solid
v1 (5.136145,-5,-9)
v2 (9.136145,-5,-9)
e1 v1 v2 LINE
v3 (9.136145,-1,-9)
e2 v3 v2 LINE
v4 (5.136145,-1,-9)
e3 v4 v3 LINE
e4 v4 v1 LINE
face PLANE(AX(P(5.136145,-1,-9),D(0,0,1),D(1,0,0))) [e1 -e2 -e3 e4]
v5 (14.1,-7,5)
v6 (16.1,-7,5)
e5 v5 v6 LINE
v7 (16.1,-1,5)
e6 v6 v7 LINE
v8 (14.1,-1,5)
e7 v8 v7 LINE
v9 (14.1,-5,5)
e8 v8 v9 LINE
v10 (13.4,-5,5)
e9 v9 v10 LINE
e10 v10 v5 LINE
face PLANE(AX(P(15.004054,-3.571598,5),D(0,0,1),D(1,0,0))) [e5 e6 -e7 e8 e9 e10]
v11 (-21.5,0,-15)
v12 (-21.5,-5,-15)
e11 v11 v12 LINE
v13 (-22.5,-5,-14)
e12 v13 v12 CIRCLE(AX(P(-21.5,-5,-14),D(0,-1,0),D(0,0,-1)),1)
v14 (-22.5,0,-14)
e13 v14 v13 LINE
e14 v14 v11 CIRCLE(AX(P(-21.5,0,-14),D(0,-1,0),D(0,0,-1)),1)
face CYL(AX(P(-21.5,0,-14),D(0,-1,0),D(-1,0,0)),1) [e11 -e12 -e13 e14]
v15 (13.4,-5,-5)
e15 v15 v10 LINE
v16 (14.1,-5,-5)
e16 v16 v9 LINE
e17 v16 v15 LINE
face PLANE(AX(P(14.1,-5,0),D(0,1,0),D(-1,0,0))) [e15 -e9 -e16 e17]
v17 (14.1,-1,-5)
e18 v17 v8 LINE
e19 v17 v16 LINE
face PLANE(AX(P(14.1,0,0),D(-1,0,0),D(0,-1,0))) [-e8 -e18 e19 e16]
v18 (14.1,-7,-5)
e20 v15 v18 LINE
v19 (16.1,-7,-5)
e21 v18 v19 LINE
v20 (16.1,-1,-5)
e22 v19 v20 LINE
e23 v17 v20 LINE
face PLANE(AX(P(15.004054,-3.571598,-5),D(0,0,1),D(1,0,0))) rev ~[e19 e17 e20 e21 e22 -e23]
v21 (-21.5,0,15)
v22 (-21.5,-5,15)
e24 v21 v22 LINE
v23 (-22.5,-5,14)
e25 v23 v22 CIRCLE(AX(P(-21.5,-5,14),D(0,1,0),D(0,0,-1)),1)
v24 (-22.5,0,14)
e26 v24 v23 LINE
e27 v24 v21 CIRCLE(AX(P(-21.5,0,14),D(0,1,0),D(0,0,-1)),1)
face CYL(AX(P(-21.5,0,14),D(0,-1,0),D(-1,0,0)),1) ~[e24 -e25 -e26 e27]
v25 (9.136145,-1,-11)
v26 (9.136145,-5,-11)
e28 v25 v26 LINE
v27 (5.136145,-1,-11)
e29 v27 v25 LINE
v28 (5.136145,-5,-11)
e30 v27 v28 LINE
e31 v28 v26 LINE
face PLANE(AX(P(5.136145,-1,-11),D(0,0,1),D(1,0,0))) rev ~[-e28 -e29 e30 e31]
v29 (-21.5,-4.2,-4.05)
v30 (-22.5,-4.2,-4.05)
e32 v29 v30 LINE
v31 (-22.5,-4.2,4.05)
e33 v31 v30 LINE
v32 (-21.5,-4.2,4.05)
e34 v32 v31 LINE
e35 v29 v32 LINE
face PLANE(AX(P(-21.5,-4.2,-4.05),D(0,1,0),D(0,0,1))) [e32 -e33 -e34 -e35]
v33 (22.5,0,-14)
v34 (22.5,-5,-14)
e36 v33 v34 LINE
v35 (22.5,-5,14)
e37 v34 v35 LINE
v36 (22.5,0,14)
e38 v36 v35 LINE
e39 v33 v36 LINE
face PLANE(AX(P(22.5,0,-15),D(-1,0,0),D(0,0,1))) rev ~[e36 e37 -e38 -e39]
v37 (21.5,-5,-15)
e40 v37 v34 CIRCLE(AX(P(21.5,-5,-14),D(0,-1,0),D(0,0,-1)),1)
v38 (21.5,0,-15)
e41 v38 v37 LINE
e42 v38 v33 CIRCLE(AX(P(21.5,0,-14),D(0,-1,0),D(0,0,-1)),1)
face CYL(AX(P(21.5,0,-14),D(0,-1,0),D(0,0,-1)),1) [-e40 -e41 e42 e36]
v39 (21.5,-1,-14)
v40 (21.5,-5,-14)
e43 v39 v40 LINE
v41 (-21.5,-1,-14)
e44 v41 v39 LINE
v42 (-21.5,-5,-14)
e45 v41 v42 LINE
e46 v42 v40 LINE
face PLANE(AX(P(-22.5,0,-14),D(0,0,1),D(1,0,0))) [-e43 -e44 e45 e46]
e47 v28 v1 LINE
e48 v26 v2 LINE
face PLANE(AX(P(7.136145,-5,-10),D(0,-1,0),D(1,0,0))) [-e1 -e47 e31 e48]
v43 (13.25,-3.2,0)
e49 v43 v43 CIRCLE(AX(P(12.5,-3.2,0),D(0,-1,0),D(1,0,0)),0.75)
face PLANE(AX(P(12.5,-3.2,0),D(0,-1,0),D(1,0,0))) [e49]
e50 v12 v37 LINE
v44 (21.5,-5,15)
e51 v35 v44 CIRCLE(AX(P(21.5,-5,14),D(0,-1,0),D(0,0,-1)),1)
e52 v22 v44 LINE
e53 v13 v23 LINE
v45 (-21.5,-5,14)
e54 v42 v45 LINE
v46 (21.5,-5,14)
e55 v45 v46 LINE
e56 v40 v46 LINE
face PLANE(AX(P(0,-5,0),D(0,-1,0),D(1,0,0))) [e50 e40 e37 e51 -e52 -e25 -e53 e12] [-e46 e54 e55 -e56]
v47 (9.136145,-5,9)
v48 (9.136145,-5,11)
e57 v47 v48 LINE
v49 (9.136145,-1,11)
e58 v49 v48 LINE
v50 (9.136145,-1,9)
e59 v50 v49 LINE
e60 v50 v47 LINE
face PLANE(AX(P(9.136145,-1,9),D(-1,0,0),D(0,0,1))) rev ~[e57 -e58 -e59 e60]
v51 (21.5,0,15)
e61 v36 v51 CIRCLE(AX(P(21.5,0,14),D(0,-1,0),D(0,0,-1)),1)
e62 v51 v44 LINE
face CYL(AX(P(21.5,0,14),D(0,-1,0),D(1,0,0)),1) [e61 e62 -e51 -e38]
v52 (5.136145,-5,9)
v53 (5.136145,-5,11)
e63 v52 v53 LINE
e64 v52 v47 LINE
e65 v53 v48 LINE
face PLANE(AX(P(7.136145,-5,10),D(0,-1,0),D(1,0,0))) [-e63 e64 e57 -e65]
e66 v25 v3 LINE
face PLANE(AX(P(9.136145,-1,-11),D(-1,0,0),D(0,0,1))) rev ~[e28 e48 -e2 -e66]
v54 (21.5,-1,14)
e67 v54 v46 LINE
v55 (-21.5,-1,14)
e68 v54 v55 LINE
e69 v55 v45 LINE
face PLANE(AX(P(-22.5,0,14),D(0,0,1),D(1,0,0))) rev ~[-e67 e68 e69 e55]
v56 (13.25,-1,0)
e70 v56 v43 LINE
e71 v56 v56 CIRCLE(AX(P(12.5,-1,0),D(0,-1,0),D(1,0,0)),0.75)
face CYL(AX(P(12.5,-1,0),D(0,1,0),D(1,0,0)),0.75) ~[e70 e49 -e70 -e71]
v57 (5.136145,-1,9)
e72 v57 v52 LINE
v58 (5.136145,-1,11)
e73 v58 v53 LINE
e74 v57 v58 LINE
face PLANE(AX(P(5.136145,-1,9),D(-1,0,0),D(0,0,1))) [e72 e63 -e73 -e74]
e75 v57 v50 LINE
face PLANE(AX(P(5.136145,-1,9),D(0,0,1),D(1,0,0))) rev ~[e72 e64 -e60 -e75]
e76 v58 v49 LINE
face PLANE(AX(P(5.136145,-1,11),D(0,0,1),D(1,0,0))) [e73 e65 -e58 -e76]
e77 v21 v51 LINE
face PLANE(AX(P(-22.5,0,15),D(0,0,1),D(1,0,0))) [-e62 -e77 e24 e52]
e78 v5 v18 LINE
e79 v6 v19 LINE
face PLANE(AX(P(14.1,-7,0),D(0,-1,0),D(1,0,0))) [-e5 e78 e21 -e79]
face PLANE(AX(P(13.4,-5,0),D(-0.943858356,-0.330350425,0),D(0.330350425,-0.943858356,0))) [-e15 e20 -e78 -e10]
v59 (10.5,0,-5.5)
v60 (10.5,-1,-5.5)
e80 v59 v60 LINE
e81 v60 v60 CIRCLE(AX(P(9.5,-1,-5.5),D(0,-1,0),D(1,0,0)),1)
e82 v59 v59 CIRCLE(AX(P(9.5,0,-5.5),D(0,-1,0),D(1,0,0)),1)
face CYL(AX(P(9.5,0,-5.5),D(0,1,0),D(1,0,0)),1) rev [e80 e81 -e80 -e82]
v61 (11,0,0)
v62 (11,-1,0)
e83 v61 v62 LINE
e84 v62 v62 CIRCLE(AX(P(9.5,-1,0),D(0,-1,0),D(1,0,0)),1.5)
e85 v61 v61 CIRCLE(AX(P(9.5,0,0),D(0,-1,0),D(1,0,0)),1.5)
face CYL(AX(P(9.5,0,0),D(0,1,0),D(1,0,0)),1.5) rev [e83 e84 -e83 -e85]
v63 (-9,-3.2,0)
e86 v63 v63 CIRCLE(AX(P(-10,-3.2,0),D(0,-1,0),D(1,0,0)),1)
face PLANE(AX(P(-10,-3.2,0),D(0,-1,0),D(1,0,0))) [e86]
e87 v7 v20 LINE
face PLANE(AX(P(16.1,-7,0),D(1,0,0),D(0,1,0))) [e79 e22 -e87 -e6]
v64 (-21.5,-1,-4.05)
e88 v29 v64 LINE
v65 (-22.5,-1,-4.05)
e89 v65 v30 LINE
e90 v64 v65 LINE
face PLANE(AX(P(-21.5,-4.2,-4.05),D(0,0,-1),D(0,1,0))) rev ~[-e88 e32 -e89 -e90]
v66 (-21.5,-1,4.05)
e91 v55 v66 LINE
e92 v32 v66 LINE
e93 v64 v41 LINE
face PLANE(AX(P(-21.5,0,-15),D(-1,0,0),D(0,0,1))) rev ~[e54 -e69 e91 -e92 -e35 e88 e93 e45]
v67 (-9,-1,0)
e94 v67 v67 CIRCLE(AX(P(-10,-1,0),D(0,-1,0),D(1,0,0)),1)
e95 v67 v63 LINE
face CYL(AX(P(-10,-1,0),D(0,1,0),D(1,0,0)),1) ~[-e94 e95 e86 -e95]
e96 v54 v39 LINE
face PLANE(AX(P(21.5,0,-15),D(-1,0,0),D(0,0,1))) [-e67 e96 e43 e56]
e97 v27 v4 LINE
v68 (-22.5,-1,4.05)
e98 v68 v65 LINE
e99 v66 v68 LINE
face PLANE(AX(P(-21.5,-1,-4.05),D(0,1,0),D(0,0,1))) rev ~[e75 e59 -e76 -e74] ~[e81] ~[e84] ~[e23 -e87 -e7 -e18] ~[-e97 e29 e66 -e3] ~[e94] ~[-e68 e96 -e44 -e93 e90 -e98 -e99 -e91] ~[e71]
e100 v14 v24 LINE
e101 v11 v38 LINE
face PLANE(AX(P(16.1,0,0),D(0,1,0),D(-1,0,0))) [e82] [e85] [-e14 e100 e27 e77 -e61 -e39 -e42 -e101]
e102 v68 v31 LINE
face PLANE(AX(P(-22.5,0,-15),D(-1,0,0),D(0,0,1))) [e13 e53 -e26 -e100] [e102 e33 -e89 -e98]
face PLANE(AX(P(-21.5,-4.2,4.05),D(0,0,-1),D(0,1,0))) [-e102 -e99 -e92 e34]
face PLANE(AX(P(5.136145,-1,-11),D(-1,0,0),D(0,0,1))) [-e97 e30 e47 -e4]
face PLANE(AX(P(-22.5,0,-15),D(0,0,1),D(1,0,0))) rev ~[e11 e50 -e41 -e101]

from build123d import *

# Parameters (mm, degrees)
F0_W      = 45
F0_H      = 30
F0_R      = 1
F0_R_2    = 1.5
F1_DEPTH  = 5
F2_R      = 1
F3_T      = 1
F4_W      = 3.2
F4_H      = 8.1
F5_DEPTH  = 25
F6_R      = 1
F7_DEPTH  = 2.2
F10_DEPTH = 5
F11_R     = 0.75
F12_DEPTH = 2.2
F13_W     = 4
F13_H     = 2
F14_DEPTH = 4


# Not quite as in the source:
# - a shell that OpenCascade refuses in one call is made with other operations: the cavity is built on its own and cut out


with BuildPart() as f1:
    # F0 (on Front) → F1 (new body)
    with BuildSketch(Plane.XZ):
        Rectangle(F0_W, F0_H)
        with Locations((9.5, -5.5)):
            Circle(F0_R, mode=Mode.SUBTRACT)
        with Locations((-10, 0)):
            Circle(F0_R, mode=Mode.SUBTRACT)
        with Locations((9.5, 0)):
            Circle(F0_R_2, mode=Mode.SUBTRACT)
        with Locations((-10, 0)):
            Circle(F0_R)
    extrude(amount=F1_DEPTH)

    # F2
    f2_edges = [f1.edges().sort_by_distance(p)[0] for p in [
        (-22.5, -2.5, -15),
        (22.5, -2.5, -15),
        (22.5, -2.5, 15),
        (-22.5, -2.5, 15),
    ]]
    fillet(f2_edges, radius=F2_R)

    # F3: shell of thickness 1, made by hand


with BuildPart() as f3_core1:
    # F3_t2: copy of F1
    add(f1.part)

    # the walls: a layer under each face that stays
    f3_faces = [f3_core1.faces().sort_by_distance(p)[0] for p in [
        (0, -2.5, -15),
        (0, 0, 0),
        (-22.5, -2.5, 0),
        (22.5, -2.5, 0),
        (0, -2.5, 15),
    ]]
    thicken(f3_faces, amount=-F3_T, mode=Mode.SUBTRACT)


with BuildPart() as f1_1:
    add(f1.part)

    # what is left inside the walls is the cavity
    f3_cavity = [f3_core1.part.solids().sort_by_distance(p)[0] for p in [
        (0, -1.01, -4.666667),
    ]]
    add(f3_cavity, mode=Mode.SUBTRACT)

    # F4 (on face) → F5 (cut)
    with BuildSketch(Plane.YZ.offset(-21.5)):
        with Locations((-2.6, 0)):
            Rectangle(F4_W, F4_H)
    extrude(amount=-F5_DEPTH, mode=Mode.SUBTRACT)

    # F6 (on face) → F7 (join)
    with BuildSketch(Plane.XZ.offset(1)):
        with Locations((-10, 0)):
            Circle(F6_R)
    extrude(amount=F7_DEPTH)

    # F9 (on Top) → F10 (join, symmetric)
    with BuildSketch(Plane.XY):
        Polygon((16.1, 0), (14.1, 0), (14.1, -5), (13.4, -5), (14.1, -7), (16.1, -7), align=None)
    extrude(amount=F10_DEPTH, both=True)

    # F11 (on face) → F12 (join, through all)
    with BuildSketch(Plane.XZ.offset(1)):
        with Locations((12.5, 0)):
            Circle(F11_R)
    extrude(amount=F12_DEPTH)

    # F13 (on face) → F14 (join, through all)
    with BuildSketch(Plane.XZ.offset(1)):
        with Locations((7.1361453363, 10)):
            Rectangle(F13_W, F13_H)
        with Locations((7.1361453363, -10)):
            Rectangle(F13_W, F13_H)
    extrude(amount=F14_DEPTH)


solid = f1_1.part
